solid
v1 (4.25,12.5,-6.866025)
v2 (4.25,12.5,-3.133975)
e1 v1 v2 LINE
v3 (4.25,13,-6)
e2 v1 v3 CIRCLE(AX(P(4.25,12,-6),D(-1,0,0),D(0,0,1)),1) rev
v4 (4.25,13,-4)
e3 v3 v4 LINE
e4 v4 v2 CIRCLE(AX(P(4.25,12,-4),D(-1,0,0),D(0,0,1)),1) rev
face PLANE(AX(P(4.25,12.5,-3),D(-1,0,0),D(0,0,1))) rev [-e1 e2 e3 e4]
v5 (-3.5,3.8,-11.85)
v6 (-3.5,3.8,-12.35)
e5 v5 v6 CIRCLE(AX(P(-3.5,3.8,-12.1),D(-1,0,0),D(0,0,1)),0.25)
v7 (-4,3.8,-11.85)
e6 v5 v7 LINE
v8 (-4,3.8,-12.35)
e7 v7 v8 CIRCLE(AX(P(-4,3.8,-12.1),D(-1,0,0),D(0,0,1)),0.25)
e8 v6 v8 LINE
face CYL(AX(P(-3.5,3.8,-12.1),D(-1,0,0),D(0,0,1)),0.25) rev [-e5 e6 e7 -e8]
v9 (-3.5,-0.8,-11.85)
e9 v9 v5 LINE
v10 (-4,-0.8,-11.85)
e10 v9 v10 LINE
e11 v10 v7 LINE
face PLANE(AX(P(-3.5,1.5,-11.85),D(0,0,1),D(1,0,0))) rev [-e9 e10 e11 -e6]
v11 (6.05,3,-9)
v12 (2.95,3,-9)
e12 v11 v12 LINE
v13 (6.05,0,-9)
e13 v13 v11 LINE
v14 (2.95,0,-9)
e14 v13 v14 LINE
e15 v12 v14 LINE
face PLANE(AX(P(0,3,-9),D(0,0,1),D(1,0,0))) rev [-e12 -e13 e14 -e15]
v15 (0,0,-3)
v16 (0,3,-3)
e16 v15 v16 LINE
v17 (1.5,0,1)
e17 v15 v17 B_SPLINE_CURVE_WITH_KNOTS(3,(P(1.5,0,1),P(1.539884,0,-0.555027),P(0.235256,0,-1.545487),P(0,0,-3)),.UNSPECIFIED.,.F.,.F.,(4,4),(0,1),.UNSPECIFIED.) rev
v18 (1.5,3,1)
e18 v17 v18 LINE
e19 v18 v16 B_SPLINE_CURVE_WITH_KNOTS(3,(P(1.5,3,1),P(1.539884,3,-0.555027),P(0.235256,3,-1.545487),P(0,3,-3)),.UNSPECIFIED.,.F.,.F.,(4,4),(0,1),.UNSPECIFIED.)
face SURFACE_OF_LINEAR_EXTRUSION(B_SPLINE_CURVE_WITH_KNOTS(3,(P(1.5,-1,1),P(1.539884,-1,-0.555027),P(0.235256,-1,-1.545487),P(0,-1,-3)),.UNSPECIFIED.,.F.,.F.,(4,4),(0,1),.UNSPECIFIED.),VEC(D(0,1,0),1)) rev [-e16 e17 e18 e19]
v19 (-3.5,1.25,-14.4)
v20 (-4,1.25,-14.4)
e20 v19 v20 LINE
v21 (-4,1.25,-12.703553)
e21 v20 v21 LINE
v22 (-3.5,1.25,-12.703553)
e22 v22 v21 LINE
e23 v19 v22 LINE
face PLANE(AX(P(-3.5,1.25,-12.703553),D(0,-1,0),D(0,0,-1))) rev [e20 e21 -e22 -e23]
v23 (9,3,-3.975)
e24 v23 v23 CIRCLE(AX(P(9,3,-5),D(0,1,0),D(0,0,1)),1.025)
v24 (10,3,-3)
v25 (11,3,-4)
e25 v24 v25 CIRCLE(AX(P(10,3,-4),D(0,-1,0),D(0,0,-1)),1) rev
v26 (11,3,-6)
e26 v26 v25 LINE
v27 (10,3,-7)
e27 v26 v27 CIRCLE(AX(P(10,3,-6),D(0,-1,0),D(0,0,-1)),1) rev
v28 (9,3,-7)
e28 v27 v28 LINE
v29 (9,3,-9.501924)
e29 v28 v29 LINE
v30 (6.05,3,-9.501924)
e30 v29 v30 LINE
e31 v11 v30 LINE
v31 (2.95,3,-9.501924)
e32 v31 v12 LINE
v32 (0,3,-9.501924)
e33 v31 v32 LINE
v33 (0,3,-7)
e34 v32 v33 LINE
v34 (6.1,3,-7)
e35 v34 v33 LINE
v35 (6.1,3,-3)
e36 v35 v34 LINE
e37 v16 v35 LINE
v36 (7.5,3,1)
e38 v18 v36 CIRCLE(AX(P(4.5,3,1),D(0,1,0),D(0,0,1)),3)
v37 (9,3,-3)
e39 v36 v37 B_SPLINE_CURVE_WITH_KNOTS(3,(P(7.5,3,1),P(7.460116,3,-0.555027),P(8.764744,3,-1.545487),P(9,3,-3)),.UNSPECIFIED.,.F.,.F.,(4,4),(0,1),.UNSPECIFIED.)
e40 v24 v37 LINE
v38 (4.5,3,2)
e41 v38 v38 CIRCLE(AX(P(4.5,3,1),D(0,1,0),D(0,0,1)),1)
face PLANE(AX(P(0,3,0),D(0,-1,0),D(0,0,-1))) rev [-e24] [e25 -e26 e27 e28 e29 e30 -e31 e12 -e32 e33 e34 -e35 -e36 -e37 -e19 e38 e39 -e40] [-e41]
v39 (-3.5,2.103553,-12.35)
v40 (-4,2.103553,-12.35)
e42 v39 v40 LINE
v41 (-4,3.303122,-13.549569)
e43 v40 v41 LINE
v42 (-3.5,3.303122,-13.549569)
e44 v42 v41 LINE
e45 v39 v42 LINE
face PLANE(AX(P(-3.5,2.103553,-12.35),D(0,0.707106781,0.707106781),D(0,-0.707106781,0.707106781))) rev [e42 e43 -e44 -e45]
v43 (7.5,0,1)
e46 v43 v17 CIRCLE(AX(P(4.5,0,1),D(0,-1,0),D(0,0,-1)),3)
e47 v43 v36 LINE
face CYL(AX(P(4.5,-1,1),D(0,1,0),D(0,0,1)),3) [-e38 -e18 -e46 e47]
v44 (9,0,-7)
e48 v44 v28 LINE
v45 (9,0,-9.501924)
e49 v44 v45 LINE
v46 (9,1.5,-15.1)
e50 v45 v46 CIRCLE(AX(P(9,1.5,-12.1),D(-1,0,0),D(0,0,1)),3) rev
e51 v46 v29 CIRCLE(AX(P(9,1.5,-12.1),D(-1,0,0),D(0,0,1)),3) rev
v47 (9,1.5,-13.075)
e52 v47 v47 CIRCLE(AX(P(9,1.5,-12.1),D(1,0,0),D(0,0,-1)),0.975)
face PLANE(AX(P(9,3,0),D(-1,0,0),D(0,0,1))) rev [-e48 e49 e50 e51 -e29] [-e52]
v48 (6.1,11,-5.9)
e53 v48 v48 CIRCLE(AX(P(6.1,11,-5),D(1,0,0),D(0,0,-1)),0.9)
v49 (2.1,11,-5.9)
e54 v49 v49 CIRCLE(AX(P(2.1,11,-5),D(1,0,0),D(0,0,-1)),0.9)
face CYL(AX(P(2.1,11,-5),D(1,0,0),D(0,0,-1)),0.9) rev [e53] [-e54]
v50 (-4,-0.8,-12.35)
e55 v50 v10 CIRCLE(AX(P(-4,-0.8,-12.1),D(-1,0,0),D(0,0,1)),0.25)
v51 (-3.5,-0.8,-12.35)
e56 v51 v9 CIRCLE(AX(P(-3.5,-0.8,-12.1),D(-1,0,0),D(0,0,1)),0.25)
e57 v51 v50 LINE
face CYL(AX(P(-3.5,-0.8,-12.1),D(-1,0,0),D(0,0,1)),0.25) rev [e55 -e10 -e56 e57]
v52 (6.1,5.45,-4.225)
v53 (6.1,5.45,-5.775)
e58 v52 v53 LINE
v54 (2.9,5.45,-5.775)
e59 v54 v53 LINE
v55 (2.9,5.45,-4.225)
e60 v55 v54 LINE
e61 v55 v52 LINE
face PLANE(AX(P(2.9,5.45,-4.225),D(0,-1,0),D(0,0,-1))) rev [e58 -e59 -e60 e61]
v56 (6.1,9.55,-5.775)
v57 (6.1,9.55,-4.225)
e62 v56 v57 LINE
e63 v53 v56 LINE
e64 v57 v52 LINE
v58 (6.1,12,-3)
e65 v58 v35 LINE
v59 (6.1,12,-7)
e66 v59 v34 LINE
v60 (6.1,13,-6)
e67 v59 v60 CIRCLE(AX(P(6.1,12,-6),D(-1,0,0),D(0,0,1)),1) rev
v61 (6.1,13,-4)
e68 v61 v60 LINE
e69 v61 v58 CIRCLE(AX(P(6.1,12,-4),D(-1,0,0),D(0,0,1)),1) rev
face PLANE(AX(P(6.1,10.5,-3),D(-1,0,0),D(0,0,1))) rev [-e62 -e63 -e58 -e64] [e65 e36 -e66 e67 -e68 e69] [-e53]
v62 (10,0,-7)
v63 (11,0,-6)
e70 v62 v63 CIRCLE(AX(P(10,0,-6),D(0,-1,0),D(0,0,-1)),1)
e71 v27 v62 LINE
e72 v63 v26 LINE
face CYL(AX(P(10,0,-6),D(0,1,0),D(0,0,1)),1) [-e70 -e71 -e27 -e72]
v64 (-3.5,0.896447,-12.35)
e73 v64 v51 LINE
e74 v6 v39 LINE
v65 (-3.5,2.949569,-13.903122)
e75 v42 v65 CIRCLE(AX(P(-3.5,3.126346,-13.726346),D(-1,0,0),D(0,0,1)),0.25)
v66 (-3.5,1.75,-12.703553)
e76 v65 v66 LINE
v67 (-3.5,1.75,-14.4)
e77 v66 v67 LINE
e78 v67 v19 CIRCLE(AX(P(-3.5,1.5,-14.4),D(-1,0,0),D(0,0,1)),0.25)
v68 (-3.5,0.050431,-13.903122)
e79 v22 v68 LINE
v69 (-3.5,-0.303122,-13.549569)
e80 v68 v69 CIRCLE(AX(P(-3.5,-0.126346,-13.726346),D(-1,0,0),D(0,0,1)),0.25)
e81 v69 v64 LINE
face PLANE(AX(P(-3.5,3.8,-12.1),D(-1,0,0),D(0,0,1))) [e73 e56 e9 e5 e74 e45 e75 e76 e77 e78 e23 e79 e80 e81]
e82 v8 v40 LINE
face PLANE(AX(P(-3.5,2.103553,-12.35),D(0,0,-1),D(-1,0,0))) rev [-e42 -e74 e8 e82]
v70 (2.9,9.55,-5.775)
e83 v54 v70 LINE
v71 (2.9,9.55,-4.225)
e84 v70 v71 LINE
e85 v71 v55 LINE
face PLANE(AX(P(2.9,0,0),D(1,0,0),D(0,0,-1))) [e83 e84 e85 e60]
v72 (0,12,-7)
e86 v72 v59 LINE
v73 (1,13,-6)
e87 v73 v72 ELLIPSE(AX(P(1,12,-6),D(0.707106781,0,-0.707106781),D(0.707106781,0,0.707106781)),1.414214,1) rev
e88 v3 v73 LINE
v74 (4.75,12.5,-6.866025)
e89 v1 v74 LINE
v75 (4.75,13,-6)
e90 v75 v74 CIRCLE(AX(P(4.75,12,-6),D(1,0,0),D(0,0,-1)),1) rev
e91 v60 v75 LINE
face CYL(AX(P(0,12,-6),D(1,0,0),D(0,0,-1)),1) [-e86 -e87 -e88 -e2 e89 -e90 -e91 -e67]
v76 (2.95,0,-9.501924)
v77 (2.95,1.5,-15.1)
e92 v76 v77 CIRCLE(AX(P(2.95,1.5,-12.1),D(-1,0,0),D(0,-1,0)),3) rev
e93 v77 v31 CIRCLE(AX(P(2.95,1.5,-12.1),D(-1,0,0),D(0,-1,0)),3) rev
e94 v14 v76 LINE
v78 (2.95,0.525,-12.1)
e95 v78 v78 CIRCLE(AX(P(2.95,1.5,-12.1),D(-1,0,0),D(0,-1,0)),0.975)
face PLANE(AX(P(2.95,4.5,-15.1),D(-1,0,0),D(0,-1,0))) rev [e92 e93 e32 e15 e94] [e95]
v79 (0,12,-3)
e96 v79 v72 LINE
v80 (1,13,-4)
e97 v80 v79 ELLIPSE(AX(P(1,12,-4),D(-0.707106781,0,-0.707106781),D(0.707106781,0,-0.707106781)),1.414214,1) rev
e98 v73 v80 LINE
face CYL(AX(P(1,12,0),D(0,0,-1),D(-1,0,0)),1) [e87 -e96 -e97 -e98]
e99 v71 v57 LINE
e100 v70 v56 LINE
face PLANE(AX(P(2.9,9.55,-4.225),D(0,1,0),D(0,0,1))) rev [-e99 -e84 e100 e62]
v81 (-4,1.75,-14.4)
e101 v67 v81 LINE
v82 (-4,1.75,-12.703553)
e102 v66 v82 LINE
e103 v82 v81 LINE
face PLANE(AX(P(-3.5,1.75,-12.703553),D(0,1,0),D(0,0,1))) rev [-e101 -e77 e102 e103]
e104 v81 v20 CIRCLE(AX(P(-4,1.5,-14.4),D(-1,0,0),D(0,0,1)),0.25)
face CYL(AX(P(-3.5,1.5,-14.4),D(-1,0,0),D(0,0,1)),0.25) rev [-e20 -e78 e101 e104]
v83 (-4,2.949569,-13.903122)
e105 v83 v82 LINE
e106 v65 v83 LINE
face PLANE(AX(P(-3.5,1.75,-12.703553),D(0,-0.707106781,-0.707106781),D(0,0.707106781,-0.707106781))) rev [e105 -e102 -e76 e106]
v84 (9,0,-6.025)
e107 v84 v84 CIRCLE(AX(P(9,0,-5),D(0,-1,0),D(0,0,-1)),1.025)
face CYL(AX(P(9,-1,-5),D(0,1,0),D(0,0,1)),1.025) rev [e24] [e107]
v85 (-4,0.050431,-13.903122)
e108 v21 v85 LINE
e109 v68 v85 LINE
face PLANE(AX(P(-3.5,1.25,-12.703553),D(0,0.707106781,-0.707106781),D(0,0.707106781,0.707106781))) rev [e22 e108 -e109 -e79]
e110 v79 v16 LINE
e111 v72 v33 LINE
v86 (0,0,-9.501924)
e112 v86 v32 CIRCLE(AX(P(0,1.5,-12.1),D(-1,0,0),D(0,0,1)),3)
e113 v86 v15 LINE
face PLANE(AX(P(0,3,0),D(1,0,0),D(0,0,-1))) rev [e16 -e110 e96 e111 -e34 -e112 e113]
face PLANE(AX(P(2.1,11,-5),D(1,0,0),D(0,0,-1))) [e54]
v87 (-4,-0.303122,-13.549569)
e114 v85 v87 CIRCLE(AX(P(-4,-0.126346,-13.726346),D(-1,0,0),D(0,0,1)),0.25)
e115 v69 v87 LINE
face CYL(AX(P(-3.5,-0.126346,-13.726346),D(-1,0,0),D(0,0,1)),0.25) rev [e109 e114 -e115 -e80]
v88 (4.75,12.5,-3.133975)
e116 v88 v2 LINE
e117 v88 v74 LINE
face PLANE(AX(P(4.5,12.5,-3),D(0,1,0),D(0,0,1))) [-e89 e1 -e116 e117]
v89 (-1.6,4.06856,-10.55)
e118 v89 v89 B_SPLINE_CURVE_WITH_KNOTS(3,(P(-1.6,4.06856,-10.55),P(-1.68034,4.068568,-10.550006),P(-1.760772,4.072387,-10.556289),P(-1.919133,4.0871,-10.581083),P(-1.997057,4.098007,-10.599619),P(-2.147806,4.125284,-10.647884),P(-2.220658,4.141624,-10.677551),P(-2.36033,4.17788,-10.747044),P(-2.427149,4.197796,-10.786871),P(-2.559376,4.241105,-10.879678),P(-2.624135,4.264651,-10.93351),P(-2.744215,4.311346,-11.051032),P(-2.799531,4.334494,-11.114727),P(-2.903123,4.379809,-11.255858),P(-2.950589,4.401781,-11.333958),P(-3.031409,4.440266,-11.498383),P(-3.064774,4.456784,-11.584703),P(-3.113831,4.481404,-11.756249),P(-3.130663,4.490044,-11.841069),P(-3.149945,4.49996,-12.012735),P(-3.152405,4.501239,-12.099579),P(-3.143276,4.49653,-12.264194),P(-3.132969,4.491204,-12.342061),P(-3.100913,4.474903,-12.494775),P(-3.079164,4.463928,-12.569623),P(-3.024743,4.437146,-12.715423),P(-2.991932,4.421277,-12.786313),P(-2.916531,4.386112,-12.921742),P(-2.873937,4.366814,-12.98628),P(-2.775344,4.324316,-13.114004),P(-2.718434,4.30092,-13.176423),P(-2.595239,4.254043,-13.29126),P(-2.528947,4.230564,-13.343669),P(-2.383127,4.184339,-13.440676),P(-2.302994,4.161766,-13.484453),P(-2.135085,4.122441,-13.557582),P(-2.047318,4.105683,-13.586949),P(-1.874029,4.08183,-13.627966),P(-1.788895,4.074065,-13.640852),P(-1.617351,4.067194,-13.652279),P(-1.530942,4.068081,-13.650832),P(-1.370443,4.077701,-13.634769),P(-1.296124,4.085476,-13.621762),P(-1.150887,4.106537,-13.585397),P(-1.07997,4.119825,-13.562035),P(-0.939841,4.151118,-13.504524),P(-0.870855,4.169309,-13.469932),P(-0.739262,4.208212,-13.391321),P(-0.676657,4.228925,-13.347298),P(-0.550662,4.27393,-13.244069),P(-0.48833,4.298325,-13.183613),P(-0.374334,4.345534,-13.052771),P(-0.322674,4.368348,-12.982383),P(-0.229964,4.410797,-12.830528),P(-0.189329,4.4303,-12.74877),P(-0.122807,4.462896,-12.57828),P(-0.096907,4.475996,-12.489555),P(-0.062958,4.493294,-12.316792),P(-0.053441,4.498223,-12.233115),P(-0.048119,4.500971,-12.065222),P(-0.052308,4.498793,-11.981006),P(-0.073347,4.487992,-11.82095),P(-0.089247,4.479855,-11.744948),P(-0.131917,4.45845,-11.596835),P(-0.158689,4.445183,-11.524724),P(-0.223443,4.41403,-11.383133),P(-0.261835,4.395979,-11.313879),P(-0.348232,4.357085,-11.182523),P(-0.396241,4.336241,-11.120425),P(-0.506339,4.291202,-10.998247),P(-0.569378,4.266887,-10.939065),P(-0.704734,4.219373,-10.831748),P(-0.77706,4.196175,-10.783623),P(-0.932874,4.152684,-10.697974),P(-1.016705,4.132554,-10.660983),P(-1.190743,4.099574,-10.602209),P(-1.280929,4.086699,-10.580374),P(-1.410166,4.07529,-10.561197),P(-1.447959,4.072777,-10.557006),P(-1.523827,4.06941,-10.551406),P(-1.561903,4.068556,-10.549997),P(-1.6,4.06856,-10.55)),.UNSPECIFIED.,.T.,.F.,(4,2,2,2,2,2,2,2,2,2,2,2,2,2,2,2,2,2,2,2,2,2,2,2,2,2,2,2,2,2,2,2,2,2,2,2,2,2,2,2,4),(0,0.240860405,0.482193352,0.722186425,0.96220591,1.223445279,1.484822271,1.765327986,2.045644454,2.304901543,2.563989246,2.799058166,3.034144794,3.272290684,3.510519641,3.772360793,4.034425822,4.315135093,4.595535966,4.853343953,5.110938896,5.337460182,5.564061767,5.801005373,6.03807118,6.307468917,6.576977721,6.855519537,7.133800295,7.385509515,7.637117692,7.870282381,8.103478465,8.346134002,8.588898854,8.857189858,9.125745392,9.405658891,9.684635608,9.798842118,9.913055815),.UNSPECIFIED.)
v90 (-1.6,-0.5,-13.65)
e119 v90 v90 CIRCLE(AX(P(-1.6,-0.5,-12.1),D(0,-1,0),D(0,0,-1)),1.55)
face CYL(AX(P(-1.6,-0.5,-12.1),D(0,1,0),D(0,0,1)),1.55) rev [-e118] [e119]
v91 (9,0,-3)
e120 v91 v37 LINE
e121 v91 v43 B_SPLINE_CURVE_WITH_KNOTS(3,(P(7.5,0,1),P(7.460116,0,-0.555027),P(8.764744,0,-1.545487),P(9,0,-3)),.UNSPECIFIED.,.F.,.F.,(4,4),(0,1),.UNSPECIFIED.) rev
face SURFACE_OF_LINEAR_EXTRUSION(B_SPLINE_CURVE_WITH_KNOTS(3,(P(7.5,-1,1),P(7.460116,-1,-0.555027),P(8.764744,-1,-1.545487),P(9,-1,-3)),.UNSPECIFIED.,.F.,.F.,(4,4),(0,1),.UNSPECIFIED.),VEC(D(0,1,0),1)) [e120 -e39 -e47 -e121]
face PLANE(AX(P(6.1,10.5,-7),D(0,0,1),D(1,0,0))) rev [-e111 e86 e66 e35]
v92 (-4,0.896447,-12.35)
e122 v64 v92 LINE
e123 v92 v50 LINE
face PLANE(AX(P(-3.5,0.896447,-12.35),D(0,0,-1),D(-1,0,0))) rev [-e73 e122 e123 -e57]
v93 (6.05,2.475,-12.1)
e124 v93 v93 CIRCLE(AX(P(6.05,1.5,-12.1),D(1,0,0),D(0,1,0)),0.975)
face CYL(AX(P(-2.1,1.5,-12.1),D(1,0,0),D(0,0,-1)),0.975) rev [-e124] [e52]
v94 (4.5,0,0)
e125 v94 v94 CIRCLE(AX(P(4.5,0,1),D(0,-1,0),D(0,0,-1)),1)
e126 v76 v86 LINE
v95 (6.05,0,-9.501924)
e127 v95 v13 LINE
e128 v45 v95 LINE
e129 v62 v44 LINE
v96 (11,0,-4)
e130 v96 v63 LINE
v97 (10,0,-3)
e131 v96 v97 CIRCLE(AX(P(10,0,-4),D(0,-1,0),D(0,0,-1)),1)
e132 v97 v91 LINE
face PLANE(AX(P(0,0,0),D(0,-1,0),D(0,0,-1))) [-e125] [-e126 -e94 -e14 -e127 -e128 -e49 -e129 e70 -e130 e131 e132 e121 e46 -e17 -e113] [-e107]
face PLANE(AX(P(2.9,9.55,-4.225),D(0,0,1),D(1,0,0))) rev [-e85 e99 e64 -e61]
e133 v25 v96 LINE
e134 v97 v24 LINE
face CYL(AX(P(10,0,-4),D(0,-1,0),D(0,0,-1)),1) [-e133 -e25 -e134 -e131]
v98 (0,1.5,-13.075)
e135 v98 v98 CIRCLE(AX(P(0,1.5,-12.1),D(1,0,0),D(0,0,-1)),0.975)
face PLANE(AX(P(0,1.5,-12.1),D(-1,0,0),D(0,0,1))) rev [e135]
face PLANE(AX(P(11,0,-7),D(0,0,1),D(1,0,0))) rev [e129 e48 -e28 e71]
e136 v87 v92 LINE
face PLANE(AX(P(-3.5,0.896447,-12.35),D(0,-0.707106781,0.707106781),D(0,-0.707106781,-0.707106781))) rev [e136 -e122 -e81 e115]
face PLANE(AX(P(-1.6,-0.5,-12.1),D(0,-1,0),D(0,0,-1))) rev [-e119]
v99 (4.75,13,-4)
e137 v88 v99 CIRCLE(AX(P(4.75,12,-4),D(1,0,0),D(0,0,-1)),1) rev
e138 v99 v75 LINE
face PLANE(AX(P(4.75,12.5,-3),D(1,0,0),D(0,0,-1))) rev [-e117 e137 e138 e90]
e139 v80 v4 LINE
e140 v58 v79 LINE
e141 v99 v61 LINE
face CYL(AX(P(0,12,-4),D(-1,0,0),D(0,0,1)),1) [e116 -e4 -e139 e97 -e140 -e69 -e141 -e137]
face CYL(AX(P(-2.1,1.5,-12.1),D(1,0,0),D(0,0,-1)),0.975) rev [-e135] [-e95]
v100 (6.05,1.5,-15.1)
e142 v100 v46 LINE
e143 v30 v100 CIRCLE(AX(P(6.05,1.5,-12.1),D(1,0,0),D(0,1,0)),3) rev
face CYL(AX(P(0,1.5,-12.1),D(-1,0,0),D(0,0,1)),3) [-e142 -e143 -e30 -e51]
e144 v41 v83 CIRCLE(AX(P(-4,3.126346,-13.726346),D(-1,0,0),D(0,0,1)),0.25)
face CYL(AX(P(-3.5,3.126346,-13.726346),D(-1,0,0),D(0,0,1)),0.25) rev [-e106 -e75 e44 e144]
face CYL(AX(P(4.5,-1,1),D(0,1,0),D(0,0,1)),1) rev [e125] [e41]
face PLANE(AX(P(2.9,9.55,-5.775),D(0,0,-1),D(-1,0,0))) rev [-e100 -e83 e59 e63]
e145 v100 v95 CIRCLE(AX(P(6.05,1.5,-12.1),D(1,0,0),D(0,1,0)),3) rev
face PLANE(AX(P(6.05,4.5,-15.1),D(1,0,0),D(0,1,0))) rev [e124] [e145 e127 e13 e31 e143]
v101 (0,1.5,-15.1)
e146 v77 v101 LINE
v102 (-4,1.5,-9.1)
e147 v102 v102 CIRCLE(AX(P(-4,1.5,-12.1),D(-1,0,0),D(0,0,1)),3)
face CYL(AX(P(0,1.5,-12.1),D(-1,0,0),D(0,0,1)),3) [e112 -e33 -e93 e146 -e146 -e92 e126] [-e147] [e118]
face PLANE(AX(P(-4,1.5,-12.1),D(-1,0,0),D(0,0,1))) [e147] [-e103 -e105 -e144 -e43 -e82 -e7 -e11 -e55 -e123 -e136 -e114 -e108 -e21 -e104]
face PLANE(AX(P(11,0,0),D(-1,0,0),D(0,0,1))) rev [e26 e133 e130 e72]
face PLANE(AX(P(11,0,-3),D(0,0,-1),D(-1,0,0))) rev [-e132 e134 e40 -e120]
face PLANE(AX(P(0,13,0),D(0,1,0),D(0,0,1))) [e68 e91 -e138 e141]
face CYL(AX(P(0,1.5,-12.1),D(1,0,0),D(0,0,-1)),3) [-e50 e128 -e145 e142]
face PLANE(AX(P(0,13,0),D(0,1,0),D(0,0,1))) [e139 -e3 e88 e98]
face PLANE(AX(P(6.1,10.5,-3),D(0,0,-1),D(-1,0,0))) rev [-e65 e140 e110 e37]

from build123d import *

# Parameters (mm, degrees)
SKETCH1_W           = 9
SKETCH1_H           = 9
BOSS_EXTRUDE1_DEPTH = 3
SKETCH2_W           = 2.95
SKETCH2_H           = 6
BOSS_EXTRUDE2_DEPTH = 6.1
FILLET1_R           = 3
SKETCH3_R           = 0.975
CUT_EXTRUDE1_DEPTH  = 11.1
CUT_EXTRUDE3_DEPTH  = 21.1
BOSS_EXTRUDE3_START = 4
SKETCH5_R           = 3
BOSS_EXTRUDE3_DEPTH = 4
SKETCH8_R           = 1.55
CUT_EXTRUDE4_DEPTH  = 5
CUT_EXTRUDE5_DEPTH  = 0.5
SKETCH10_W          = 9
SKETCH10_H          = 3
BOSS_EXTRUDE4_DEPTH = 4
SKETCH11_R          = 1
CUT_EXTRUDE6_DEPTH  = 4
CUT_EXTRUDE7_DEPTH  = 4
SKETCH13_W          = 6.1
SKETCH13_H          = 4
BOSS_EXTRUDE7_DEPTH = 7.5
SKETCH16_W          = 1.55
SKETCH16_H          = 4.1
CUT_EXTRUDE9_DEPTH  = 3.2
SKETCH17_W          = 4
SKETCH17_H          = 3
BOSS_EXTRUDE8_DEPTH = 2
SKETCH19_R          = 1.025
CUT_EXTRUDE10_DEPTH = 4
FILLET2_R           = 1
SKETCH21_W          = 6.1
SKETCH21_H          = 4
BOSS_EXTRUDE9_DEPTH = 2.5
SKETCH23_R          = 0.9
CUT_EXTRUDE11_DEPTH = 4
FILLET3_R           = 1
CUT_EXTRUDE12_DEPTH = 0.5


with BuildPart() as part:
    # Sketch1 → Boss-Extrude1 (new body)
    with BuildSketch(Plane(origin=(0, 0, 0), x_dir=(1, 0, 0), z_dir=(0, 1, 0))):
        with Locations((4.5, 4.5)):
            Rectangle(SKETCH1_W, SKETCH1_H)
    extrude(amount=BOSS_EXTRUDE1_DEPTH)

    # Sketch2 → Boss-Extrude2 (add)
    with BuildSketch(Plane(origin=(0, 0, -9), x_dir=(-1, 0, 0), z_dir=(0, 0, -1))):
        with Locations((-7.525, 1.5)):
            Rectangle(SKETCH2_W, SKETCH2_H)
        with Locations((-1.475, 1.5)):
            Rectangle(SKETCH2_W, SKETCH2_H)
    extrude(amount=BOSS_EXTRUDE2_DEPTH)

    # Fillet1
    fillet1_edges = [part.edges().sort_by_distance(p)[0] for p in [
        (1.475, 4.5, -15.1),
        (1.475, -1.5, -15.1),
        (7.525, -1.5, -15.1),
        (7.525, 4.5, -15.1),
    ]]
    fillet(fillet1_edges, radius=FILLET1_R - 0.0001)  # a hair under: the kernel refuses the full size

    # Sketch3 → Cut-Extrude1 (cut)
    with BuildSketch(Plane(origin=(9, 0, 0), x_dir=(0, 0, -1), z_dir=(1, 0, 0))):
        with Locations((12.1, 1.5)):
            Circle(SKETCH3_R)
    extrude(amount=-CUT_EXTRUDE1_DEPTH, mode=Mode.SUBTRACT)

    # Sketch6 → Cut-Extrude3 (cut)
    with BuildSketch(Plane.ZY):
        with BuildLine():
            Line((-12.1, 4.5), (-9, 4.5))
            Line((-9, 4.5), (-9, 3))
            Line((-9, 3), (-9.501923789, 3))
            ThreePointArc((-9.501923789, 3), (-10.6, 4.098076211), (-12.1, 4.5))
        make_face()
        with BuildLine():
            Line((-12.1, -1.5), (-9, -1.5))
            Line((-9, -1.5), (-9, 0))
            Line((-9, 0), (-9.501923789, 0))
            ThreePointArc((-9.501923789, 0), (-10.6, -1.098076211), (-12.1, -1.5))
        make_face()
    extrude(amount=-CUT_EXTRUDE3_DEPTH, mode=Mode.SUBTRACT)

    # Sketch5 → Boss-Extrude3 (add)
    with BuildSketch(Plane.ZY.offset(BOSS_EXTRUDE3_START)):
        with Locations((-12.1, 1.5)):
            Circle(SKETCH5_R)
    extrude(amount=-BOSS_EXTRUDE3_DEPTH)

    # Sketch8 → Cut-Extrude4 (cut)
    with BuildSketch(Plane(origin=(0, 4.5, 0), x_dir=(-1, 0, 0), z_dir=(0, -1, 0))):
        with Locations(Location((1.6, 12.1, 0), (0, 0, 270))):
            Circle(SKETCH8_R)
    extrude(amount=CUT_EXTRUDE4_DEPTH, mode=Mode.SUBTRACT)

    # Sketch9 → Cut-Extrude5 (cut)
    with BuildSketch(Plane.ZY.offset(4)):
        with BuildLine():
            Line((-11.85, 1.5), (-11.85, -0.8))
            ThreePointArc((-11.85, -0.8), (-12.1, -1.05), (-12.35, -0.8))
            Line((-12.35, -0.8), (-12.35, 0.896446609))
            Line((-12.35, 0.896446609), (-13.549568901, -0.303122292))
            ThreePointArc((-13.549568901, -0.303122292), (-13.903122292, -0.303122292), (-13.903122292, 0.050431099))
            Line((-13.903122292, 0.050431099), (-12.703553391, 1.25))
            Line((-12.703553391, 1.25), (-14.4, 1.25))
            ThreePointArc((-14.4, 1.25), (-14.65, 1.5), (-14.4, 1.75))
            Line((-14.4, 1.75), (-12.703553391, 1.75))
            Line((-12.703553391, 1.75), (-13.903122292, 2.949568901))
            ThreePointArc((-13.903122292, 2.949568901), (-13.903122292, 3.303122292), (-13.549568901, 3.303122292))
            Line((-13.549568901, 3.303122292), (-12.35, 2.103553391))
            Line((-12.35, 2.103553391), (-12.35, 3.8))
            ThreePointArc((-12.35, 3.8), (-12.1, 4.05), (-11.85, 3.8))
            Line((-11.85, 3.8), (-11.85, 1.5))
        make_face()
    extrude(amount=-CUT_EXTRUDE5_DEPTH, mode=Mode.SUBTRACT)

    # Sketch10 → Boss-Extrude4 (add)
    with BuildSketch(Plane.XY):
        with Locations((4.5, 1.5)):
            Rectangle(SKETCH10_W, SKETCH10_H)
    extrude(amount=BOSS_EXTRUDE4_DEPTH)

    # Sketch11 → Cut-Extrude6 (cut)
    with BuildSketch(Plane(origin=(0, 3, 0), x_dir=(1, 0, 0), z_dir=(0, 1, 0))):
        with Locations(Location((4.5, -1, 0), (0, 0, 270))):
            Circle(SKETCH11_R)
    extrude(amount=-CUT_EXTRUDE6_DEPTH, mode=Mode.SUBTRACT)

    # Sketch12 → Cut-Extrude7 (cut)
    with BuildSketch(Plane(origin=(0, 3, 0), x_dir=(1, 0, 0), z_dir=(0, 1, 0))):
        with BuildLine():
            add(Edge.make_bspline(
                [(1.5, -1), (1.53988428, 0.555027292), (0.235256098, 1.545486909), (0, 3)],
                knots=[0, 0, 0, 0, 1, 1, 1, 1], degree=3))
            Line((0, 3), (0, -4))
            Line((0, -4), (4.5, -4))
            ThreePointArc((4.5, -4), (2.378679656, -3.121320344), (1.5, -1))
        make_face()
        with BuildLine():
            ThreePointArc((7.5, -1), (6.621320344, -3.121320344), (4.5, -4))
            Line((4.5, -4), (9, -4))
            Line((9, -4), (9, 3))
            add(Edge.make_bspline(
                [(7.5, -1), (7.46011572, 0.555027292), (8.764743902, 1.545486909), (9, 3)],
                knots=[0, 0, 0, 0, 1, 1, 1, 1], degree=3))
        make_face()
    extrude(amount=-CUT_EXTRUDE7_DEPTH, mode=Mode.SUBTRACT)

    # Sketch13 → Boss-Extrude7 (add)
    with BuildSketch(Plane(origin=(0, 3, 0), x_dir=(1, 0, 0), z_dir=(0, 1, 0))):
        with Locations((3.05, 5)):
            Rectangle(SKETCH13_W, SKETCH13_H)
    extrude(amount=BOSS_EXTRUDE7_DEPTH)

    # Sketch16 → Cut-Extrude9 (cut)
    with BuildSketch(Plane(origin=(6.1, 0, 0), x_dir=(0, 0, -1), z_dir=(1, 0, 0))):
        with Locations((5, 7.5)):
            Rectangle(SKETCH16_W, SKETCH16_H)
    extrude(amount=-CUT_EXTRUDE9_DEPTH, mode=Mode.SUBTRACT)

    # Sketch17 → Boss-Extrude8 (add)
    with BuildSketch(Plane(origin=(9, 0, 0), x_dir=(0, 0, -1), z_dir=(1, 0, 0))):
        with Locations((5, 1.5)):
            Rectangle(SKETCH17_W, SKETCH17_H)
    extrude(amount=BOSS_EXTRUDE8_DEPTH)

    # Sketch19 → Cut-Extrude10 (cut)
    with BuildSketch(Plane(origin=(0, 3, 0), x_dir=(1, 0, 0), z_dir=(0, 1, 0))):
        with Locations(Location((9, 5, 0), (0, 0, 270))):
            Circle(SKETCH19_R)
    extrude(amount=-CUT_EXTRUDE10_DEPTH, mode=Mode.SUBTRACT)

    # Fillet2
    fillet2_edges = [part.edges().sort_by_distance(p)[0] for p in [
        (11, 1.5, -3),
        (11, 1.5, -7),
    ]]
    fillet(fillet2_edges, radius=FILLET2_R)

    # Sketch21 → Boss-Extrude9 (add)
    with BuildSketch(Plane(origin=(0, 10.5, 0), x_dir=(1, 0, 0), z_dir=(0, 1, 0))):
        with Locations((3.05, 5)):
            Rectangle(SKETCH21_W, SKETCH21_H)
    extrude(amount=BOSS_EXTRUDE9_DEPTH)

    # Sketch23 → Cut-Extrude11 (cut)
    with BuildSketch(Plane(origin=(6.1, 0, 0), x_dir=(0, 0, -1), z_dir=(1, 0, 0))):
        with Locations((5, 11)):
            Circle(SKETCH23_R)
    extrude(amount=-CUT_EXTRUDE11_DEPTH, mode=Mode.SUBTRACT)

    # Fillet3
    fillet3_edges = [part.edges().sort_by_distance(p)[0] for p in [
        (3.05, 13, -7),
        (0, 13, -5),
        (3.05, 13, -3),
    ]]
    fillet(fillet3_edges, radius=FILLET3_R)

    # Sketch24 → Cut-Extrude12 (cut)
    with BuildSketch(Plane(origin=(0, 13, 0), x_dir=(1, 0, 0), z_dir=(0, 1, 0))):
        with BuildLine():
            Line((4.25, 3), (4.25, 7))
            ThreePointArc((4.25, 7), (4.5, 7.25), (4.75, 7))
            Line((4.75, 7), (4.75, 3))
            ThreePointArc((4.75, 3), (4.5, 2.75), (4.25, 3))
        make_face()
    extrude(amount=-CUT_EXTRUDE12_DEPTH, mode=Mode.SUBTRACT)


solid = part.part
